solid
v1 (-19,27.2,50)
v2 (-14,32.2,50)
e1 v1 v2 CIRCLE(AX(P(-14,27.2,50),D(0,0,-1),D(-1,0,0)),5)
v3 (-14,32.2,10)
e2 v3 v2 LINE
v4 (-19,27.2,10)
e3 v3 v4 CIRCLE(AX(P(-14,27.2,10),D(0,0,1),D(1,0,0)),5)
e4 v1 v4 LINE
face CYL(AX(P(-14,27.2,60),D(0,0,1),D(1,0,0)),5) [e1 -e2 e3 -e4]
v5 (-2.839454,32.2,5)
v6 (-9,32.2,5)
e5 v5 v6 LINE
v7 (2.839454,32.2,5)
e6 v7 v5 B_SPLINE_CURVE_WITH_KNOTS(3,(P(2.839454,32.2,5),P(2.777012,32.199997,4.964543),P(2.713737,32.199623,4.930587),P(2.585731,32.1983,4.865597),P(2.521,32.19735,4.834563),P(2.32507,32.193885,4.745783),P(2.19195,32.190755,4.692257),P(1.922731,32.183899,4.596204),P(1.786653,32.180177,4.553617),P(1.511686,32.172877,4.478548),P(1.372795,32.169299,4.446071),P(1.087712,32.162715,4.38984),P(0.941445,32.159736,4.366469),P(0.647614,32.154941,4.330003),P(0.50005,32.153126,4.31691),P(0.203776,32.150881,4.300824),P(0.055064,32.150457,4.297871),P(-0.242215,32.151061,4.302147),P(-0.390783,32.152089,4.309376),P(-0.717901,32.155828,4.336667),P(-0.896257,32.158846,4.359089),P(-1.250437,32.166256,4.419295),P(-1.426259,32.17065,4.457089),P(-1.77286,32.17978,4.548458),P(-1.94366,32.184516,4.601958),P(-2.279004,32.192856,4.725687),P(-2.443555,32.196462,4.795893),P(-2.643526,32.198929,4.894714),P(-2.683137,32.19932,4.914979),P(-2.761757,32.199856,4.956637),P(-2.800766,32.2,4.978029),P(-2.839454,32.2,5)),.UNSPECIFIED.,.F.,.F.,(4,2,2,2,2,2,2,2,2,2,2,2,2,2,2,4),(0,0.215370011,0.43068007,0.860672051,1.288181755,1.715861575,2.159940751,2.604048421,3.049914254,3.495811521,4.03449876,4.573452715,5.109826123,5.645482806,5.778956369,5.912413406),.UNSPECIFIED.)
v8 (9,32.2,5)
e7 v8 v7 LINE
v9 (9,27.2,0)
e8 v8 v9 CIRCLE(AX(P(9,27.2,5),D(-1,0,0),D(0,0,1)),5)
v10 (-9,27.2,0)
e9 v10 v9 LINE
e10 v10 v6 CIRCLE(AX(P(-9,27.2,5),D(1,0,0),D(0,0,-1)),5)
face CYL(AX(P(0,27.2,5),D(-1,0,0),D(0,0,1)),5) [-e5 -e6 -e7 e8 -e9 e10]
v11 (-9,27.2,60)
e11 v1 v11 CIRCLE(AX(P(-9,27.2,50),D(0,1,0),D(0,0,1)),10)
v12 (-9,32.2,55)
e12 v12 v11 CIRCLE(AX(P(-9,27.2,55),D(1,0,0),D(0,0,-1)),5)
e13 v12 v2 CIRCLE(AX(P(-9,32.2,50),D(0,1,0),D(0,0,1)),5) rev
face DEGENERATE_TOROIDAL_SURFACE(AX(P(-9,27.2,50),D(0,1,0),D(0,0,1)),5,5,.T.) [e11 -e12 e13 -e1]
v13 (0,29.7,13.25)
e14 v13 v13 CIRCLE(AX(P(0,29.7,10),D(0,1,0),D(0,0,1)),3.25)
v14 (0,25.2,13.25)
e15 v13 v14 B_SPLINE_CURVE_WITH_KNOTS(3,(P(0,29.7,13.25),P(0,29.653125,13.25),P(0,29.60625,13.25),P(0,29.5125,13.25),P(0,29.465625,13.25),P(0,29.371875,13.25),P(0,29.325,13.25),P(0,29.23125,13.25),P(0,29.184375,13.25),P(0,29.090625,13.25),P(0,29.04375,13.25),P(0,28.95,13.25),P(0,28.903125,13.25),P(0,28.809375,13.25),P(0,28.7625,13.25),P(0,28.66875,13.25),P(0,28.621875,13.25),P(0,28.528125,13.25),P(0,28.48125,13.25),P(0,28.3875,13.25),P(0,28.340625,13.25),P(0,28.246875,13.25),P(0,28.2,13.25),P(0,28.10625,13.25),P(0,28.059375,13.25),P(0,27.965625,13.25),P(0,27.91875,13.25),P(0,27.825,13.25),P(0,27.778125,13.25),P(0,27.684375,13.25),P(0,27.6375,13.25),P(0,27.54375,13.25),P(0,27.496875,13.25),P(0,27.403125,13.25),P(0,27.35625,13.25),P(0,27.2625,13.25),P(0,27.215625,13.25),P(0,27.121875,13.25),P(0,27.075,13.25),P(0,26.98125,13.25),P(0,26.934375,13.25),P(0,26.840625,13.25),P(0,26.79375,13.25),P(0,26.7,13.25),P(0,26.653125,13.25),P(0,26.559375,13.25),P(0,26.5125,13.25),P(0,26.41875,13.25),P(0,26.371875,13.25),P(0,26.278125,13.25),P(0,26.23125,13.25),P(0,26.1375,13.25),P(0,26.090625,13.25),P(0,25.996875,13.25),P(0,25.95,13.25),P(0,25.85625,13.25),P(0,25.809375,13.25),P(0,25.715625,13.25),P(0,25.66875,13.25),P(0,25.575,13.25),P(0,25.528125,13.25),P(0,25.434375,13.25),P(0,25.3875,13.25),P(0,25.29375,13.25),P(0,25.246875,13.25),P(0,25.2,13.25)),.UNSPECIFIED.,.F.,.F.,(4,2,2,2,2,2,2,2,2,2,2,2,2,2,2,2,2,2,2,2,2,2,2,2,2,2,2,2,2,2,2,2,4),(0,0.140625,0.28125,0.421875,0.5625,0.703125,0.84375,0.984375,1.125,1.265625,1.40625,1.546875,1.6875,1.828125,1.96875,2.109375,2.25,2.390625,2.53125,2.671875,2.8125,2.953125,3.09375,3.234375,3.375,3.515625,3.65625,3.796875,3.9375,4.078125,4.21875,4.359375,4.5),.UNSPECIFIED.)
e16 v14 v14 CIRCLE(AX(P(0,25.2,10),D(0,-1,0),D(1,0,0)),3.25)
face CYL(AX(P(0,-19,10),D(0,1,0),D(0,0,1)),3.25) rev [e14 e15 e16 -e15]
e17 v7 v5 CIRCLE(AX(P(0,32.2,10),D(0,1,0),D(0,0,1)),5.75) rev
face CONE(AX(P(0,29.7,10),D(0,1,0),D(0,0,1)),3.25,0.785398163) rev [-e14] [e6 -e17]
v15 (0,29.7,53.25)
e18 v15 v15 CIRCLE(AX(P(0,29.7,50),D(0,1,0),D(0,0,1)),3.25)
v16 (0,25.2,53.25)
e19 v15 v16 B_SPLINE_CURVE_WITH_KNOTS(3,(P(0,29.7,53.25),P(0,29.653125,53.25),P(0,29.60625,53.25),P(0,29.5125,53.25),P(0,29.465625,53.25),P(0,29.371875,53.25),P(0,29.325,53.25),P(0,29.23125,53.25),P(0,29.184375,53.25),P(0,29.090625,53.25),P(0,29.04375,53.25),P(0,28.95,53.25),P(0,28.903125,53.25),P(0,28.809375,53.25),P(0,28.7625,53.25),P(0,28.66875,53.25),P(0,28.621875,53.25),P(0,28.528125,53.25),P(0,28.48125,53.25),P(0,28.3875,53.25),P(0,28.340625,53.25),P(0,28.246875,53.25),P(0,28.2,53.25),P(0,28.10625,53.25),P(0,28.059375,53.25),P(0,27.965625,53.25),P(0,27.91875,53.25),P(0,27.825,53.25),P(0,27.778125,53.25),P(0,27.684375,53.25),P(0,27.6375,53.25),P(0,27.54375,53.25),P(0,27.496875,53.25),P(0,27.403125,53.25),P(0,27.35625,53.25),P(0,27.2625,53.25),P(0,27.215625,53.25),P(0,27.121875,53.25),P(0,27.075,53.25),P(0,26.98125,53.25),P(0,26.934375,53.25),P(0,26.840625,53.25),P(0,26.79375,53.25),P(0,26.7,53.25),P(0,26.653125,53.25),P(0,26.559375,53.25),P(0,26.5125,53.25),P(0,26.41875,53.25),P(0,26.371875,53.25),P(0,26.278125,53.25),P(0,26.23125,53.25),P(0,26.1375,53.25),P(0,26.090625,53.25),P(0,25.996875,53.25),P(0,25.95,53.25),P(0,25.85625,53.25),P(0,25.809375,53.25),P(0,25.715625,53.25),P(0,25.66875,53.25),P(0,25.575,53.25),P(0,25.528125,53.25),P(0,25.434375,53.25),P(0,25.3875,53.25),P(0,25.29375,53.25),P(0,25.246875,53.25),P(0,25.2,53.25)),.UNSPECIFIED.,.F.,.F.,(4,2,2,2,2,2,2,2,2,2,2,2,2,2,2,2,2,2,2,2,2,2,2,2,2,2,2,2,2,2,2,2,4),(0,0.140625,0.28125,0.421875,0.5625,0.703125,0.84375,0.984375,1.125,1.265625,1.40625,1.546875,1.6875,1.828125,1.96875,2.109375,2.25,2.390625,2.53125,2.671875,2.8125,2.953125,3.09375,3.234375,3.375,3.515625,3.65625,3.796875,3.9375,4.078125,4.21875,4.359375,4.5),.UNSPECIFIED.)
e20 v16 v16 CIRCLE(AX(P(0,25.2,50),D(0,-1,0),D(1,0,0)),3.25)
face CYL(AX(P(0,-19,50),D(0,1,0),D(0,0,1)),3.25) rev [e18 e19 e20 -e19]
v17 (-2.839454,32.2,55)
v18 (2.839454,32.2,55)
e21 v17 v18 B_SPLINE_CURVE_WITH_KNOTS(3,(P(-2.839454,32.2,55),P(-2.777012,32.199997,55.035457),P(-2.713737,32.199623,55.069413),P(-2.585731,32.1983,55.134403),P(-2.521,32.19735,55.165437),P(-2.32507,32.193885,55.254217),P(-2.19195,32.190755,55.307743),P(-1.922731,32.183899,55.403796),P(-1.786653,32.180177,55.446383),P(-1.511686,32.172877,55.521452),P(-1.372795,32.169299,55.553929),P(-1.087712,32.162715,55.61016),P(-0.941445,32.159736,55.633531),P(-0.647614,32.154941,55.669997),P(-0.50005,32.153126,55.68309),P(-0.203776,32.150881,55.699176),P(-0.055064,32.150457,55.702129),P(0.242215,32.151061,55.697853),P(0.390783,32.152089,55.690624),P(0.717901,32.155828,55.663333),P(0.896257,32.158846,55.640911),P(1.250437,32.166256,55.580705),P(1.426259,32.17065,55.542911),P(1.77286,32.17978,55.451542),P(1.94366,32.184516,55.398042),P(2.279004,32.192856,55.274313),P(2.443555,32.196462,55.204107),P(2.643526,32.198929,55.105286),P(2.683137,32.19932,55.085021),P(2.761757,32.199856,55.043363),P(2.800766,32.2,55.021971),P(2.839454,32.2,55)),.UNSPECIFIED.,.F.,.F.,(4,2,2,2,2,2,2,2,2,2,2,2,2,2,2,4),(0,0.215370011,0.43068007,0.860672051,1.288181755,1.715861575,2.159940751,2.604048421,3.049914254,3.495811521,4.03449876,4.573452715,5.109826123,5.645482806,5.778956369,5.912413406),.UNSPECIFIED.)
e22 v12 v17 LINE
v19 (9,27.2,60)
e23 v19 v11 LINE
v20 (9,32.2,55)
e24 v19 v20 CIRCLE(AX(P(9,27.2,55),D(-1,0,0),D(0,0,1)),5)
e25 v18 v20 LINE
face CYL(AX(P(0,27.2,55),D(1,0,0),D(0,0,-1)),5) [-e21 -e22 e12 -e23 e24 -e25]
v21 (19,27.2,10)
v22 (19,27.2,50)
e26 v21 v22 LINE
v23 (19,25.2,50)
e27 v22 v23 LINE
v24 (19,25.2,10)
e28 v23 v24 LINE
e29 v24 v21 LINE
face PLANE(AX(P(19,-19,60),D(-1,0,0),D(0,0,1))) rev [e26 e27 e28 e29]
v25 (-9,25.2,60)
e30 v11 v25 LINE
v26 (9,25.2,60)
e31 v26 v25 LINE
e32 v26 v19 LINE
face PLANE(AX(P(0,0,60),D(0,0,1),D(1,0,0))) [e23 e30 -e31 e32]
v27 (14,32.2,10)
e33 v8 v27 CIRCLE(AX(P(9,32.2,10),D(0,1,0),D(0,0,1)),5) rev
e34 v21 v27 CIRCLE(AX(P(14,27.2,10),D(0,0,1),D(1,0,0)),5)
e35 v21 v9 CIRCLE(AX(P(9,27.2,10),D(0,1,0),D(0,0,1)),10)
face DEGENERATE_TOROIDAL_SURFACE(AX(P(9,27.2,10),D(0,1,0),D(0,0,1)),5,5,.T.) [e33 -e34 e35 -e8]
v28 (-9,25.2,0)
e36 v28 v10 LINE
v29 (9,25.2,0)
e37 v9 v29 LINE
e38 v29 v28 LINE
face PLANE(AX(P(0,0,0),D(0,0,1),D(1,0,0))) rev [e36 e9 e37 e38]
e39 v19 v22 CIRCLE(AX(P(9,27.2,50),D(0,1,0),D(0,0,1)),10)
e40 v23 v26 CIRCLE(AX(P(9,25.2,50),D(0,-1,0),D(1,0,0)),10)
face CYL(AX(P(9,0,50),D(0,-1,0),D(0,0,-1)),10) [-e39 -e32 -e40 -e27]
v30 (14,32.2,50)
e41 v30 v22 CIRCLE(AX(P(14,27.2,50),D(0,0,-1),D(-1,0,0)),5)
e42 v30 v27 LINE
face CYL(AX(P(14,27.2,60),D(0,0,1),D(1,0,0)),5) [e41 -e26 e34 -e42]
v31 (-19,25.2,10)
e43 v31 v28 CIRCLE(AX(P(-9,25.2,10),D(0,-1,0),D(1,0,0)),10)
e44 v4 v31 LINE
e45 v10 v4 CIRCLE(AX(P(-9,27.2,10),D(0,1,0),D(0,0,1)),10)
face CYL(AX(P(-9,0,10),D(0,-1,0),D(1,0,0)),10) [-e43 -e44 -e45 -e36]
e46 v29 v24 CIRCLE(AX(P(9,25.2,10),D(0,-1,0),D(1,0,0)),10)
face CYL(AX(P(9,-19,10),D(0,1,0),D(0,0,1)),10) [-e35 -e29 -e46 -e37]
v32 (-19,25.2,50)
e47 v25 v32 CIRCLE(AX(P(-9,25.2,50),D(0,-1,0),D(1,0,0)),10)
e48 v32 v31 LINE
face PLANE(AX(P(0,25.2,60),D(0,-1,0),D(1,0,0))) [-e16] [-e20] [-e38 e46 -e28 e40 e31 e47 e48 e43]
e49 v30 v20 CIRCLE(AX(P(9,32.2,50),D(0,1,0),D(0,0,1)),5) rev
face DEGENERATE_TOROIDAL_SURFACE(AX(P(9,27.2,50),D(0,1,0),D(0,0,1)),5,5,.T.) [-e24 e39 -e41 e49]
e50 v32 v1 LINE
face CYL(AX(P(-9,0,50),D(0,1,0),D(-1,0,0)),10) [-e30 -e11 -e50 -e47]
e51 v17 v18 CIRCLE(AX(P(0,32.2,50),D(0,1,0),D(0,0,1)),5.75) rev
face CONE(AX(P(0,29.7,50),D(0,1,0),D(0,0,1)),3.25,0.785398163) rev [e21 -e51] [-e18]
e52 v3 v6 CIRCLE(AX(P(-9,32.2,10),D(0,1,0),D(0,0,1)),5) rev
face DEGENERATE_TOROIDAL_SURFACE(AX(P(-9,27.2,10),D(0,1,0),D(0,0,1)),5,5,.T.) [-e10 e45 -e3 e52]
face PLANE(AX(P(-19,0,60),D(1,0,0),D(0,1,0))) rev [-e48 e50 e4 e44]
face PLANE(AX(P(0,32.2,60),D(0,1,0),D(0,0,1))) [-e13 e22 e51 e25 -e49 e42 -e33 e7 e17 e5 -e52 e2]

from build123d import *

# Parameters (mm, degrees)
SKETCH1_W           = 43
SKETCH1_H           = 43
SKETCH1_R           = 13.75
SKETCH1_H_2         = 7
BOSS_EXTRUDE1_DEPTH = 60
SKETCH3_R           = 3.25
CUT_EXTRUDE5_DEPTH  = 85.038324591
CHAMFER2_SIZE       = 2.5
CUT_EXTRUDE6_START  = -38
CUT_EXTRUDE6_DEPTH  = 15
SKETCH9_W           = 10
SKETCH9_H           = 51.2
CUT_EXTRUDE7_DEPTH  = 75.012431469
FILLET1_R           = 5
FILLET2_R           = 10


with BuildPart() as part:
    # Sketch1 → Boss-Extrude1 (new body)
    # profile 1 of 3: a face of its own
    with BuildSketch(Plane.XY):
        with Locations((2.5, 2.5)):
            Rectangle(SKETCH1_W, SKETCH1_H)
        Circle(SKETCH1_R, mode=Mode.SUBTRACT)
    # profile 2 of 3: a face of its own
    with BuildSketch(Plane.XY):
        with Locations((2.5, 28.7)):
            Rectangle(SKETCH1_W, SKETCH1_H_2)
    # profile 3 of 3: a face of its own
    with BuildSketch(Plane.XY):
        Polygon((24, 24), (24, -19), (29, -19), (29, 32.2), (24, 32.2), (24, 25.2), align=None)
    extrude(amount=BOSS_EXTRUDE1_DEPTH)

    # Sketch3 → Cut-Extrude5 (cut, through all)
    with BuildSketch(Plane(origin=(0, 32.2, 0), x_dir=(1, 0, 0), z_dir=(0, 1, 0))):
        with Locations(Location((0, -50, 0), (0, 0, 270))):
            Circle(SKETCH3_R)
        with Locations(Location((0, -10, 0), (0, 0, 270))):
            Circle(SKETCH3_R)
    extrude(amount=-CUT_EXTRUDE5_DEPTH, mode=Mode.SUBTRACT)

    # Chamfer2
    chamfer2_edges = [part.edges().sort_by_distance(p)[0] for p in [
        (0, 32.2, 46.75),
        (0, 32.2, 6.75),
    ]]
    chamfer(chamfer2_edges, length=CHAMFER2_SIZE)

    # Sketch7 → Cut-Extrude6 (cut)
    with BuildSketch(Plane.XZ.offset(19).offset(CUT_EXTRUDE6_START)):
        Polygon((0, 43.533676985), (5.6, 46.766838493), (5.6, 53.233161507), (0, 56.466323015), (-5.6, 53.233161507), (-5.6, 46.766838493), align=None)
        Polygon((-5.6, 13.233161507), (0, 16.466323015), (5.6, 13.233161507), (5.6, 6.766838493), (0, 3.533676985), (-5.6, 6.766838493), align=None)
    extrude(amount=CUT_EXTRUDE6_DEPTH, mode=Mode.SUBTRACT)

    # Sketch9 → Cut-Extrude7 (cut, through all)
    with BuildSketch(Plane(origin=(0, 0, 0), x_dir=(-1, 0, 0), z_dir=(0, 0, -1))):
        with Locations((-24, 6.6)):
            Rectangle(SKETCH9_W, SKETCH9_H)
    extrude(amount=-CUT_EXTRUDE7_DEPTH, mode=Mode.SUBTRACT)


with BuildPart() as body_2:
    # of the pieces the cut leaves, the one that is kept (cut_extrude7_keep)
    add(part.part.solids().sort_by_distance((-19, 32.2, 0))[0])

    # Fillet1
    # the kernel refuses this fillet: 5 mm, written as the material it takes off along each edge
    with BuildSketch(Plane(origin=(-31.5, 32.2, 0), x_dir=(0, 0, 1), z_dir=(1, 0, 0)), Plane(origin=(31.5, 32.2, 60), x_dir=(0, 0, -1), z_dir=(-1, 0, 0))) as fillet1_piece_1:
        with BuildLine():
            CenterArc((FILLET1_R, FILLET1_R), FILLET1_R, 180, 90)
            Line((0, FILLET1_R), (0, 0))
            Line((0, 0), (FILLET1_R, 0))
        make_face()
    extrude(amount=63, mode=Mode.SUBTRACT)
    with BuildSketch(Plane(origin=(-19, 32.2, -12.5), x_dir=(1, 0, 0), z_dir=(0, 0, 1))) as fillet1_piece_2:
        with BuildLine():
            CenterArc((FILLET1_R, -FILLET1_R), FILLET1_R, 90, 90)
            Line((0, -FILLET1_R), (0, 0))
            Line((0, 0), (FILLET1_R, 0))
        make_face()
    extrude(amount=85, mode=Mode.SUBTRACT)
    with BuildSketch(Plane(origin=(19, 32.2, -12.5), x_dir=(-1, 0, 0), z_dir=(0, 0, 1))) as fillet1_piece_3:
        with BuildLine():
            CenterArc((FILLET1_R, FILLET1_R), FILLET1_R, 180, 90)
            Line((0, FILLET1_R), (0, 0))
            Line((0, 0), (FILLET1_R, 0))
        make_face()
    extrude(amount=85, mode=Mode.SUBTRACT)

    # Fillet2
    # the kernel refuses this fillet: 10 mm, written as the material it takes off along each edge
    with BuildSketch(Plane(origin=(-9, 32.2, 10), x_dir=(0, 0, -1), z_dir=(1, 0, 0))) as fillet2_piece_1:
        with BuildLine():
            CenterArc((5, -5), 5, 0, 90)
            Line((10, -5), (10, 0))
            Line((10, 0), (5, 0))
        make_face()
    revolve(axis=Axis((-9, 32.2, 10), (0, 1, 0)), revolution_arc=90, mode=Mode.SUBTRACT)
    with BuildSketch(Plane(origin=(9, 32.2, 10), x_dir=(1, 0, 0), z_dir=(0, 0, 1))) as fillet2_piece_2:
        with BuildLine():
            CenterArc((5, -5), 5, 0, 90)
            Line((10, -5), (10, 0))
            Line((10, 0), (5, 0))
        make_face()
    revolve(axis=Axis((9, 32.2, 10), (0, 1, 0)), revolution_arc=90, mode=Mode.SUBTRACT)
    with BuildSketch(Plane(origin=(-9, 32.2, 50), x_dir=(-1, 0, 0), z_dir=(0, 0, -1))) as fillet2_piece_3:
        with BuildLine():
            CenterArc((5, -5), 5, 0, 90)
            Line((10, -5), (10, 0))
            Line((10, 0), (5, 0))
        make_face()
    revolve(axis=Axis((-9, 32.2, 50), (0, 1, 0)), revolution_arc=90, mode=Mode.SUBTRACT)
    with BuildSketch(Plane(origin=(9, 32.2, 50), x_dir=(0, 0, 1), z_dir=(-1, 0, 0))) as fillet2_piece_4:
        with BuildLine():
            CenterArc((5, -5), 5, 0, 90)
            Line((10, -5), (10, 0))
            Line((10, 0), (5, 0))
        make_face()
    revolve(axis=Axis((9, 32.2, 50), (0, 1, 0)), revolution_arc=90, mode=Mode.SUBTRACT)
    with BuildSketch(Plane(origin=(19, 32.2, 0), x_dir=(0, 0, 1), z_dir=(0, -1, 0)), Plane(origin=(-19, 32.2, 60), x_dir=(0, 0, -1), z_dir=(0, -1, 0))) as fillet2_piece_5:
        with BuildLine():
            CenterArc((FILLET2_R, FILLET2_R), FILLET2_R, 180, 90)
            Line((0, FILLET2_R), (0, 0))
            Line((0, 0), (FILLET2_R, 0))
        make_face()
    extrude(amount=32, mode=Mode.SUBTRACT)
    with BuildSketch(Plane(origin=(19, 0.2, 60), x_dir=(-1, 0, 0), z_dir=(0, 1, 0)), Plane(origin=(-19, 32.2, 0), x_dir=(0, 0, 1), z_dir=(0, -1, 0))) as fillet2_piece_6:
        with BuildLine():
            CenterArc((FILLET2_R, -FILLET2_R), FILLET2_R, 90, 90)
            Line((0, -FILLET2_R), (0, 0))
            Line((0, 0), (FILLET2_R, 0))
        make_face()
    extrude(amount=32, mode=Mode.SUBTRACT)


solid = body_2.part
